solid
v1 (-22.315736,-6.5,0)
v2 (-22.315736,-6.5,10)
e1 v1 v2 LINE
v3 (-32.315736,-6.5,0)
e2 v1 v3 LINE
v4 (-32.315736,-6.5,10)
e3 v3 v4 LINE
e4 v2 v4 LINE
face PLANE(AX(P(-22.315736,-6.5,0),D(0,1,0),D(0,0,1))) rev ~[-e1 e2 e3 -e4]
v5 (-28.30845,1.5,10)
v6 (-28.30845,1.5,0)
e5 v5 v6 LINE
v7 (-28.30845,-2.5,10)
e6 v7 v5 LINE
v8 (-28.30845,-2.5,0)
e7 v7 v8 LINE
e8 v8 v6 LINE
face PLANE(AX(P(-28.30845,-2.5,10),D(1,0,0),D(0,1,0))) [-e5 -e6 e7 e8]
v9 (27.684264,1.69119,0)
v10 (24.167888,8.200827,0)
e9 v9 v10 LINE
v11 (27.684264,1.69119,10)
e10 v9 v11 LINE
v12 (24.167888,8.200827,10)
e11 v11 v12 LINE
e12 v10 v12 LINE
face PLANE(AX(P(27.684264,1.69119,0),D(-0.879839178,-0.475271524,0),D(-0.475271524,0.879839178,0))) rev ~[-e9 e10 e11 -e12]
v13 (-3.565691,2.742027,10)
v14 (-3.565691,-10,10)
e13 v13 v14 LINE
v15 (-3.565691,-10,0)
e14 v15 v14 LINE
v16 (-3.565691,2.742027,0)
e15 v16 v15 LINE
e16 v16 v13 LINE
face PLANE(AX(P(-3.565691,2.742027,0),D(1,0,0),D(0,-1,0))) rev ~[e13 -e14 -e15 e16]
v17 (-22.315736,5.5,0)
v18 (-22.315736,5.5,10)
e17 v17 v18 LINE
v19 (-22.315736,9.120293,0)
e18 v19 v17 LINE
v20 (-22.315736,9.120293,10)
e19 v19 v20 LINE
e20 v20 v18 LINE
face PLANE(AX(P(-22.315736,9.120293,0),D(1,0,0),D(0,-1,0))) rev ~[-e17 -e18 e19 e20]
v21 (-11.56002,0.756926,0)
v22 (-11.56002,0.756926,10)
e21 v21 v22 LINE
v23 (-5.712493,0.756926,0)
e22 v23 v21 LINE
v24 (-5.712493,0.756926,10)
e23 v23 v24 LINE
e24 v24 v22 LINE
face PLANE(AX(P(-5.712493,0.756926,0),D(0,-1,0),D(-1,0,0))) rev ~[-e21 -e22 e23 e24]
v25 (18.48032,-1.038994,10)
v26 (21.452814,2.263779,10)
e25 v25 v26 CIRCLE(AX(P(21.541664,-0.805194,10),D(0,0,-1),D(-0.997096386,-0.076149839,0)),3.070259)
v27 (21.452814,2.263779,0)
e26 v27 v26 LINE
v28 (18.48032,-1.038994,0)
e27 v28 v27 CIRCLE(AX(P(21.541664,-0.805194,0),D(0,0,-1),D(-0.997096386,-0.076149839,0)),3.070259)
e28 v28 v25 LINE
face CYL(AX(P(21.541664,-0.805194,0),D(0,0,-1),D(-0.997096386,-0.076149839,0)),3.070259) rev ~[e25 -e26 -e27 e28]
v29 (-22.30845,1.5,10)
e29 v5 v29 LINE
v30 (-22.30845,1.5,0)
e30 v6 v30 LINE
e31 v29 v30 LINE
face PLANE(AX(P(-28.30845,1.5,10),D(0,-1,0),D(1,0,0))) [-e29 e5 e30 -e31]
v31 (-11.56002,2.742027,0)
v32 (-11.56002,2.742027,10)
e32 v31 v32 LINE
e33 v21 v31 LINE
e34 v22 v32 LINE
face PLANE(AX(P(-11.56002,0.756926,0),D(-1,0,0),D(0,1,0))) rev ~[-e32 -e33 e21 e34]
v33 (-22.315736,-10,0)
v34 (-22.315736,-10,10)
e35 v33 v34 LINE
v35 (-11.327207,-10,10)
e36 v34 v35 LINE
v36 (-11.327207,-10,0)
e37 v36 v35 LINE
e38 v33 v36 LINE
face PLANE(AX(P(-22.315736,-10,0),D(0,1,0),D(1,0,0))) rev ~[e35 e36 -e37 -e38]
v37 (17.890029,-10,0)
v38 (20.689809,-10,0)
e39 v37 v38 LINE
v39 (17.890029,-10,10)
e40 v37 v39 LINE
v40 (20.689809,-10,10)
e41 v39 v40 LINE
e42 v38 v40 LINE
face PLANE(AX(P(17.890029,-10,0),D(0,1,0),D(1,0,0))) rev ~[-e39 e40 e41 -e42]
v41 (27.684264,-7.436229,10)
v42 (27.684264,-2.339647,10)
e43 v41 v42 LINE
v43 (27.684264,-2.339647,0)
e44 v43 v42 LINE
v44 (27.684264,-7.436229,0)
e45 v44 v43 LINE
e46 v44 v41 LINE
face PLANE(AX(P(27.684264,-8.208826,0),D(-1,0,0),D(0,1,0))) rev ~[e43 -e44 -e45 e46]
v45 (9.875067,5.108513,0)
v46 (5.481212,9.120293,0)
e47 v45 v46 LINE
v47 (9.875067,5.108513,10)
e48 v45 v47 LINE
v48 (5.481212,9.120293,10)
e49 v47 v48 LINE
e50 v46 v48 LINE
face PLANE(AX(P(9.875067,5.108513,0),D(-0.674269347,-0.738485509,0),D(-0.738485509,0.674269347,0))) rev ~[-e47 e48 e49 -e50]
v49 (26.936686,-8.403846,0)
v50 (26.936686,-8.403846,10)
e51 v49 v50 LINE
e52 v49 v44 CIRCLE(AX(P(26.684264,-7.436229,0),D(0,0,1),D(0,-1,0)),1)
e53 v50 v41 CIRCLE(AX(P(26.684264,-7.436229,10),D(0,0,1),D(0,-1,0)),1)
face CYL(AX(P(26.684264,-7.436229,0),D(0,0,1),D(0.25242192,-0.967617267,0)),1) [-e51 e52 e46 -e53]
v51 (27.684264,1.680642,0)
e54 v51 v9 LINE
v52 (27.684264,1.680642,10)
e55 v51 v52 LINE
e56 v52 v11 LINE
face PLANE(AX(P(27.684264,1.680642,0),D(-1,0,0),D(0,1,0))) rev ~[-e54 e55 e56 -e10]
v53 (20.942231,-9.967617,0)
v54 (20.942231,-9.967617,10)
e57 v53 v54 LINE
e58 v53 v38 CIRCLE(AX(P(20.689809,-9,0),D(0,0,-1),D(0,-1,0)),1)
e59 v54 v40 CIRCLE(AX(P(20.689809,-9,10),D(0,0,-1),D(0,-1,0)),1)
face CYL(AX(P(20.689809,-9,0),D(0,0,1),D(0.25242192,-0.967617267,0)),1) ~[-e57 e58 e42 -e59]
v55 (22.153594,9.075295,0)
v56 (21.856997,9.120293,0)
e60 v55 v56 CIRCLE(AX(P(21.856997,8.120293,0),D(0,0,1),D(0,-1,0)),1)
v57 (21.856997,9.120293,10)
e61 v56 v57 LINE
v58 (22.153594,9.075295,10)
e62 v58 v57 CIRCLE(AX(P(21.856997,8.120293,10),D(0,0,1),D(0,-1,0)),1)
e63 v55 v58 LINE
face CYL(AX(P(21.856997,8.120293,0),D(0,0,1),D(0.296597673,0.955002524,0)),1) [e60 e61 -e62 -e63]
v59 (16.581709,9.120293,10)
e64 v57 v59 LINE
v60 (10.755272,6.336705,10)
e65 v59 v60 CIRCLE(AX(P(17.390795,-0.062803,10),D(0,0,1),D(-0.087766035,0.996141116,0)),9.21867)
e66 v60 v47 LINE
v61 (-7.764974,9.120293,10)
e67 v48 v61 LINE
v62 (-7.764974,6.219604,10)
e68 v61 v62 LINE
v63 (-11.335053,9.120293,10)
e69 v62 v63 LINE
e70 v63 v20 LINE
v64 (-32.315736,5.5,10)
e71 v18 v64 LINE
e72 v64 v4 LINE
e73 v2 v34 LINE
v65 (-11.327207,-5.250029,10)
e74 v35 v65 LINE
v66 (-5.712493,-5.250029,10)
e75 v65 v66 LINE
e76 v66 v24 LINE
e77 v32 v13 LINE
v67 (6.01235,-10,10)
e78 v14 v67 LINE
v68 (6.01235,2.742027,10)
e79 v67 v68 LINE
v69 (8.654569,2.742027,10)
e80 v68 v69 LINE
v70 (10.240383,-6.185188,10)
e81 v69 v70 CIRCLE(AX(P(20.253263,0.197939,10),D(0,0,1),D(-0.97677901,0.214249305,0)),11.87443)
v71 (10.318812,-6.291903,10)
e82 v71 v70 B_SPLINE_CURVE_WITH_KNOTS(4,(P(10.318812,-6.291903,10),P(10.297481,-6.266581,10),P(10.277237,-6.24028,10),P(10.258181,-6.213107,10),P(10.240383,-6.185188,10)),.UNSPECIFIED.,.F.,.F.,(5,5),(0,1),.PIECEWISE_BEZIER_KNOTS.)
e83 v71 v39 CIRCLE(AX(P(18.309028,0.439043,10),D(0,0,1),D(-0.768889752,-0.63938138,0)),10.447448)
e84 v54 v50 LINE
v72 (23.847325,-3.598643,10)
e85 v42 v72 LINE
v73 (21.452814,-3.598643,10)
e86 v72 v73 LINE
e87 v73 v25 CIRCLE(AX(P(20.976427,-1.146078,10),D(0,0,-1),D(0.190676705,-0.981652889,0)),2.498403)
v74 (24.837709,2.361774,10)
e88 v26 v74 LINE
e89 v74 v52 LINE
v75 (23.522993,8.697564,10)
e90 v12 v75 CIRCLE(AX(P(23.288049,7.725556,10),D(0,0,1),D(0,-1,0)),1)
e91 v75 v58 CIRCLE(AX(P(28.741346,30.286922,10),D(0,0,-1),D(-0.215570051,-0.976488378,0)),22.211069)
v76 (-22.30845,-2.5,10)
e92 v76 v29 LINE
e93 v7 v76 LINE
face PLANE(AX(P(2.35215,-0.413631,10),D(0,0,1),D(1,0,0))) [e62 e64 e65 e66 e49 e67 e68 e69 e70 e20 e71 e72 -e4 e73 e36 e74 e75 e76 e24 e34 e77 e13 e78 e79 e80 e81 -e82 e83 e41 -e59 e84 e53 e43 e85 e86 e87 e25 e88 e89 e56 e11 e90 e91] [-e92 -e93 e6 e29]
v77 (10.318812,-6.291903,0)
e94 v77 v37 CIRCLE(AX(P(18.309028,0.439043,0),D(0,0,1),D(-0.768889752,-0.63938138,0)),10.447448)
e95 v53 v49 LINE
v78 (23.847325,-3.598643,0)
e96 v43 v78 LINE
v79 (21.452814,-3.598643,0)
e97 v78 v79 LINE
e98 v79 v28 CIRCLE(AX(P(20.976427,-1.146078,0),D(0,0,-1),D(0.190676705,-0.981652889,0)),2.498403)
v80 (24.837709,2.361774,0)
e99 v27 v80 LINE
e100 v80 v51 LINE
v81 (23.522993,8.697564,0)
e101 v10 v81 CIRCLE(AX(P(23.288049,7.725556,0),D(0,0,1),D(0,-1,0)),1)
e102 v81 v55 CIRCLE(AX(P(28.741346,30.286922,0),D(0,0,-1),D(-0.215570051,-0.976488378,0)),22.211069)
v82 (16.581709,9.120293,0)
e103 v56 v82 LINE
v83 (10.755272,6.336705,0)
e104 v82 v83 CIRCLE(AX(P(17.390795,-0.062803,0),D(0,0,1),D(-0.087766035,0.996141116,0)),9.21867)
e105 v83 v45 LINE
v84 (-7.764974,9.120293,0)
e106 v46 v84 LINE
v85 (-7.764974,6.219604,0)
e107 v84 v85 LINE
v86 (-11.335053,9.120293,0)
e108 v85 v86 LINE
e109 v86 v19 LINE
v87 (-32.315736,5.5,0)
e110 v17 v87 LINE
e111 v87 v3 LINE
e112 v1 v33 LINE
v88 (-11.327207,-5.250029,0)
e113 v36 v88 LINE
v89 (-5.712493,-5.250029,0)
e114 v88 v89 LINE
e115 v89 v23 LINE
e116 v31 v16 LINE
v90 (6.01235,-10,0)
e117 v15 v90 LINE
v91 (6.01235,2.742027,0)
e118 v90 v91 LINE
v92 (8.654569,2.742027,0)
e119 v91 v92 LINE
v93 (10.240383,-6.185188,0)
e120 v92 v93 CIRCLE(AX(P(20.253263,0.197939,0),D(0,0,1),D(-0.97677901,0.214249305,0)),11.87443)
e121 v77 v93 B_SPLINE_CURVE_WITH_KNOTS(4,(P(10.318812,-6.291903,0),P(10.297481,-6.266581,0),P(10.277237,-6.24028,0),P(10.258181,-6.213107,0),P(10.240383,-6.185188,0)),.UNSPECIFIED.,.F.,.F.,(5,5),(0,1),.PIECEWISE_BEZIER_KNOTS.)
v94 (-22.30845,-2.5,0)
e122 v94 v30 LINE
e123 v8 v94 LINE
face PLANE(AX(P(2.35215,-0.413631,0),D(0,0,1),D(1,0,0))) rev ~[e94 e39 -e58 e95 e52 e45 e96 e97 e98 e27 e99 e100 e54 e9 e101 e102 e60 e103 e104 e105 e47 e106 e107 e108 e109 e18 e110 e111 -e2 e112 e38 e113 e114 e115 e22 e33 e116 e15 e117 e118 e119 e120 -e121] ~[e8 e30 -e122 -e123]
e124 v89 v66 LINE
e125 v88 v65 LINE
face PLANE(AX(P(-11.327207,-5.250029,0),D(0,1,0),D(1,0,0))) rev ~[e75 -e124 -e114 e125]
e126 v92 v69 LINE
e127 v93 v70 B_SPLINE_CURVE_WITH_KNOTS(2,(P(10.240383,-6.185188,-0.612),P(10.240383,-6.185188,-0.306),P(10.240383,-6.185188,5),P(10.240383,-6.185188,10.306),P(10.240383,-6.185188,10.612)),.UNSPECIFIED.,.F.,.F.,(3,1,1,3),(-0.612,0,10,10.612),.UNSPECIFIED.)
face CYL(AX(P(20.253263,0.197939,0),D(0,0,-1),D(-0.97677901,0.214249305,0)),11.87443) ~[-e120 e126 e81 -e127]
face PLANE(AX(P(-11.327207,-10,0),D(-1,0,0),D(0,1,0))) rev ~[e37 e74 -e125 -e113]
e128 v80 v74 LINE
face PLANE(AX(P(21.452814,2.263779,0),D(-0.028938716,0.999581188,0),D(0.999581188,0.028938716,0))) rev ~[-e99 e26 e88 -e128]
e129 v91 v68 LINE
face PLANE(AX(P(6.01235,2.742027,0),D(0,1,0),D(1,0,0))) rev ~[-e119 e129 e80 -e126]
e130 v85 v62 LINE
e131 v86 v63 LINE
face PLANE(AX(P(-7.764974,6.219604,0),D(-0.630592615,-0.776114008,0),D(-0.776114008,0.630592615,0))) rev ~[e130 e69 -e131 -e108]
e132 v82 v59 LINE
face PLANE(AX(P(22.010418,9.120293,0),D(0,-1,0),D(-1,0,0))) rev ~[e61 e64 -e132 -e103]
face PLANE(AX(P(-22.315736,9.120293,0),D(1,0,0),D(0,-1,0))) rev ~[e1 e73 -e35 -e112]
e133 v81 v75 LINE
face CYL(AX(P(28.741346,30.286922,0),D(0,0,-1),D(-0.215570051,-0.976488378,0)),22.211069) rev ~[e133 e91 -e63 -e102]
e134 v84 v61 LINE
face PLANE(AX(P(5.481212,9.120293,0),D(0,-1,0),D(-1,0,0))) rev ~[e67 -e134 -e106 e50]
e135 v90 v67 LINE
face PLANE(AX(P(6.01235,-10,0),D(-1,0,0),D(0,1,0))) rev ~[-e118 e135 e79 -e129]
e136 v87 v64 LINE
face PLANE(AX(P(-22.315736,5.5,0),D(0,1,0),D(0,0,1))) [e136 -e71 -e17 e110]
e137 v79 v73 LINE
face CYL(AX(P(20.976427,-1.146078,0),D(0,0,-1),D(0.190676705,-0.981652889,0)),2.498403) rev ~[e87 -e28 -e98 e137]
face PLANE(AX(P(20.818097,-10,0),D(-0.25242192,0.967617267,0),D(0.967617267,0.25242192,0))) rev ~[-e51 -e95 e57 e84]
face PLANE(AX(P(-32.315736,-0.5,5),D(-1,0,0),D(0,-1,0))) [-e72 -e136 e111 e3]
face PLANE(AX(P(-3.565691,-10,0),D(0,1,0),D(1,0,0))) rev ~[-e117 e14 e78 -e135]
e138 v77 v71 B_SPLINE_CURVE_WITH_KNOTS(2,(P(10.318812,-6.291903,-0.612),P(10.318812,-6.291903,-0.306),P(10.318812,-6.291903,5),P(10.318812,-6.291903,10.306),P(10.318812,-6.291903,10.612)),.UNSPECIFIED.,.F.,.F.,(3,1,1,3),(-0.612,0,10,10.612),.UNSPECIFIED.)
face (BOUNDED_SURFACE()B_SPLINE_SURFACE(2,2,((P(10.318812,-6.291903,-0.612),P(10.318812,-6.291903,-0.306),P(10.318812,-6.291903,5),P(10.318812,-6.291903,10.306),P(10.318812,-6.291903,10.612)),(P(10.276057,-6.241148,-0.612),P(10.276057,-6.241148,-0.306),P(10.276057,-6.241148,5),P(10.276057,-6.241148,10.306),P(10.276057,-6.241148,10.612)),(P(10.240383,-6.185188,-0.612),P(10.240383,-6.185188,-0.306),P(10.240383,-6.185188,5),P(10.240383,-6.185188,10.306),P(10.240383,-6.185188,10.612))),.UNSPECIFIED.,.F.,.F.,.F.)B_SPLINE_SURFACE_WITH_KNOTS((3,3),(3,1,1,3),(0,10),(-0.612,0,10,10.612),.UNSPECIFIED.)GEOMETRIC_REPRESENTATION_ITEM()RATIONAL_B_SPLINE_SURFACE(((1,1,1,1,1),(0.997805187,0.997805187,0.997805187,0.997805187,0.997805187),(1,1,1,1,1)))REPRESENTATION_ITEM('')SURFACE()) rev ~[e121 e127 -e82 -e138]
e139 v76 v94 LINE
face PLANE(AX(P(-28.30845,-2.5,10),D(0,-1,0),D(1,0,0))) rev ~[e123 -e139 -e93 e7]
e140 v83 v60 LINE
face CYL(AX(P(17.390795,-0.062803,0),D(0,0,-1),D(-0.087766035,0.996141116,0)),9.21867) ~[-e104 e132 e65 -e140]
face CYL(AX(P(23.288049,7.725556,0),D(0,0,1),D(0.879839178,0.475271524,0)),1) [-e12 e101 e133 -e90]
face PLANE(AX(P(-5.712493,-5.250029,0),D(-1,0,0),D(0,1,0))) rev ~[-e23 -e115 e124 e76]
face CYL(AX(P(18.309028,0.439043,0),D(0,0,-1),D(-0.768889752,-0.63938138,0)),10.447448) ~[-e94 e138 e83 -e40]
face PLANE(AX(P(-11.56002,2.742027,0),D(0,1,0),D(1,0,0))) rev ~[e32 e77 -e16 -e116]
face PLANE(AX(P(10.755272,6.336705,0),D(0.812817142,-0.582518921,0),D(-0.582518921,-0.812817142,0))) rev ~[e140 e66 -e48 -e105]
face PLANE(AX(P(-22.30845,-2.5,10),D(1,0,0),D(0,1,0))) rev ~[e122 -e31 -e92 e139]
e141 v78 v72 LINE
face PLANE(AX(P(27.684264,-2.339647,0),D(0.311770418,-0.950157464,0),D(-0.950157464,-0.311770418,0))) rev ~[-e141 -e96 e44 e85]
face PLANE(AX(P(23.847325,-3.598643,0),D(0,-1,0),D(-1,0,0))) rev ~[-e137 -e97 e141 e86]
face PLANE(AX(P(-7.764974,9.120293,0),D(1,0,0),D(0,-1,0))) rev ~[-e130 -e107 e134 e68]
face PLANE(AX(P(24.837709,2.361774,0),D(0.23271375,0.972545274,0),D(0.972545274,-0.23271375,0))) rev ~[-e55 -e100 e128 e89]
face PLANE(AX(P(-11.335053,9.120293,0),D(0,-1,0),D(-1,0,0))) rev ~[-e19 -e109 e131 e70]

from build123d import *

# Parameters (mm, degrees)
F1_DEPTH = 10
F2_R     = 1
F3_R     = 1
F4_R     = 1
F5_W     = 12
F5_H     = 10
F6_DEPTH = 10
F7_W     = 6
F7_H     = 4
F8_DEPTH = 25


with BuildPart() as f1:
    # F0 (on Top) → F1 (new body)
    with BuildSketch(Plane.XY):
        with BuildLine():
            Line((-11.3350533053, 9.1202929616), (-22.3157362798, 9.1202929616))
            Line((-22.3157362798, 9.1202929616), (-22.3157362798, -10))
            Line((-22.3157362798, -10), (-11.3272070885, -10))
            Line((-11.3272070885, -10), (-11.3272070885, -5.2500292659))
            Line((-11.3272070885, -5.2500292659), (-5.7124928571, -5.2500292659))
            Line((-5.7124928571, -5.2500292659), (-5.7124928571, 0.7569257868))
            Line((-5.7124928571, 0.7569257868), (-11.560020037, 0.7569257868))
            Line((-11.560020037, 0.7569257868), (-11.560020037, 2.7420271654))
            Line((-11.560020037, 2.7420271654), (-3.565690713, 2.7420271654))
            Line((-3.565690713, 2.7420271654), (-3.565690713, -10))
            Line((-3.565690713, -10), (6.0123503208, -10))
            Line((6.0123503208, -10), (6.0123503208, 2.7420271654))
            Line((6.0123503208, 2.7420271654), (8.6545692757, 2.7420271654))
            ThreePointArc((8.6545692757, 2.7420271654), (8.5676927282, -1.911451746), (10.2760922164, -6.2408610247))
            ThreePointArc((10.2760922164, -6.2408610247), (13.6839247097, -8.9288594524), (17.8900292945, -10))
            Line((17.8900292945, -10), (18.7280271202, -10))
            Line((18.7280271202, -10), (20.8180968398, -10))
            Line((20.8180968398, -10), (27.6842637202, -8.2088258604))
            Line((27.6842637202, -8.2088258604), (27.6842637202, -2.3396474093))
            Line((27.6842637202, -2.3396474093), (23.8473247737, -3.5986430012))
            Line((23.8473247737, -3.5986430012), (21.4528143406, -3.5986430012))
            ThreePointArc((21.4528143406, -3.5986430012), (19.3461607597, -3.0392900389), (18.4803195298, -1.038994058))
            ThreePointArc((18.4803195298, -1.038994058), (19.2595578745, 1.248700369), (21.4528143406, 2.2637788206))
            Line((21.4528143406, 2.2637788206), (24.837708557, 2.3617743547))
            Line((24.837708557, 2.3617743547), (27.6842637202, 1.6806415132))
            Line((27.6842637202, 1.6806415132), (27.6842637202, 1.6911900602))
            Line((27.6842637202, 1.6911900602), (23.953304423, 8.5980716969))
            ThreePointArc((23.953304423, 8.5980716969), (22.975945626, 8.8371730757), (22.0104184033, 9.1202929616))
            Line((22.0104184033, 9.1202929616), (16.5817085654, 9.1202929616))
            ThreePointArc((16.5817085654, 9.1202929616), (13.4167991013, 8.2553236841), (10.7552717232, 6.3367054882))
            Line((10.7552717232, 6.3367054882), (9.8750670095, 5.1085127981))
            Line((9.8750670095, 5.1085127981), (5.4812123415, 9.1202929616))
            Line((5.4812123415, 9.1202929616), (-7.7649741434, 9.1202929616))
            Line((-7.7649741434, 9.1202929616), (-7.7649741434, 6.2196037167))
            Line((-7.7649741434, 6.2196037167), (-11.3350533053, 9.1202929616))
        make_face()
    extrude(amount=F1_DEPTH)

    # F2
    f2_edges = [f1.edges().sort_by_distance(p)[0] for p in [
        (23.953304, 8.598072, 5),
        (22.010418, 9.120293, 5),
    ]]
    fillet(f2_edges, radius=F2_R)

    # F3
    f3_edges = [f1.edges().sort_by_distance(p)[0] for p in [
        (17.890029, -10, 5),
        (20.818097, -10, 5),
    ]]
    fillet(f3_edges, radius=F3_R)

    # F4
    f4_edges = [f1.edges().sort_by_distance(p)[0] for p in [
        (27.684264, -8.208826, 5),
        (10.276092, -6.240861, 5),
    ]]
    fillet(f4_edges, radius=F4_R)

    # F5 (on face) → F6 (join)
    with BuildSketch(Plane(origin=(-22.3157362798, 0, 0), x_dir=(0, -1, 0), z_dir=(-1, 0, 0))):
        with Locations((0.5, 5)):
            Rectangle(F5_W, F5_H)
    extrude(amount=F6_DEPTH)

    # F7 (on face) → F8 (cut)
    with BuildSketch(Plane.XY.offset(10)):
        with Locations((-25.3084501922, -0.5)):
            Rectangle(F7_W, F7_H)
    extrude(amount=-F8_DEPTH, mode=Mode.SUBTRACT)


solid = f1.part
